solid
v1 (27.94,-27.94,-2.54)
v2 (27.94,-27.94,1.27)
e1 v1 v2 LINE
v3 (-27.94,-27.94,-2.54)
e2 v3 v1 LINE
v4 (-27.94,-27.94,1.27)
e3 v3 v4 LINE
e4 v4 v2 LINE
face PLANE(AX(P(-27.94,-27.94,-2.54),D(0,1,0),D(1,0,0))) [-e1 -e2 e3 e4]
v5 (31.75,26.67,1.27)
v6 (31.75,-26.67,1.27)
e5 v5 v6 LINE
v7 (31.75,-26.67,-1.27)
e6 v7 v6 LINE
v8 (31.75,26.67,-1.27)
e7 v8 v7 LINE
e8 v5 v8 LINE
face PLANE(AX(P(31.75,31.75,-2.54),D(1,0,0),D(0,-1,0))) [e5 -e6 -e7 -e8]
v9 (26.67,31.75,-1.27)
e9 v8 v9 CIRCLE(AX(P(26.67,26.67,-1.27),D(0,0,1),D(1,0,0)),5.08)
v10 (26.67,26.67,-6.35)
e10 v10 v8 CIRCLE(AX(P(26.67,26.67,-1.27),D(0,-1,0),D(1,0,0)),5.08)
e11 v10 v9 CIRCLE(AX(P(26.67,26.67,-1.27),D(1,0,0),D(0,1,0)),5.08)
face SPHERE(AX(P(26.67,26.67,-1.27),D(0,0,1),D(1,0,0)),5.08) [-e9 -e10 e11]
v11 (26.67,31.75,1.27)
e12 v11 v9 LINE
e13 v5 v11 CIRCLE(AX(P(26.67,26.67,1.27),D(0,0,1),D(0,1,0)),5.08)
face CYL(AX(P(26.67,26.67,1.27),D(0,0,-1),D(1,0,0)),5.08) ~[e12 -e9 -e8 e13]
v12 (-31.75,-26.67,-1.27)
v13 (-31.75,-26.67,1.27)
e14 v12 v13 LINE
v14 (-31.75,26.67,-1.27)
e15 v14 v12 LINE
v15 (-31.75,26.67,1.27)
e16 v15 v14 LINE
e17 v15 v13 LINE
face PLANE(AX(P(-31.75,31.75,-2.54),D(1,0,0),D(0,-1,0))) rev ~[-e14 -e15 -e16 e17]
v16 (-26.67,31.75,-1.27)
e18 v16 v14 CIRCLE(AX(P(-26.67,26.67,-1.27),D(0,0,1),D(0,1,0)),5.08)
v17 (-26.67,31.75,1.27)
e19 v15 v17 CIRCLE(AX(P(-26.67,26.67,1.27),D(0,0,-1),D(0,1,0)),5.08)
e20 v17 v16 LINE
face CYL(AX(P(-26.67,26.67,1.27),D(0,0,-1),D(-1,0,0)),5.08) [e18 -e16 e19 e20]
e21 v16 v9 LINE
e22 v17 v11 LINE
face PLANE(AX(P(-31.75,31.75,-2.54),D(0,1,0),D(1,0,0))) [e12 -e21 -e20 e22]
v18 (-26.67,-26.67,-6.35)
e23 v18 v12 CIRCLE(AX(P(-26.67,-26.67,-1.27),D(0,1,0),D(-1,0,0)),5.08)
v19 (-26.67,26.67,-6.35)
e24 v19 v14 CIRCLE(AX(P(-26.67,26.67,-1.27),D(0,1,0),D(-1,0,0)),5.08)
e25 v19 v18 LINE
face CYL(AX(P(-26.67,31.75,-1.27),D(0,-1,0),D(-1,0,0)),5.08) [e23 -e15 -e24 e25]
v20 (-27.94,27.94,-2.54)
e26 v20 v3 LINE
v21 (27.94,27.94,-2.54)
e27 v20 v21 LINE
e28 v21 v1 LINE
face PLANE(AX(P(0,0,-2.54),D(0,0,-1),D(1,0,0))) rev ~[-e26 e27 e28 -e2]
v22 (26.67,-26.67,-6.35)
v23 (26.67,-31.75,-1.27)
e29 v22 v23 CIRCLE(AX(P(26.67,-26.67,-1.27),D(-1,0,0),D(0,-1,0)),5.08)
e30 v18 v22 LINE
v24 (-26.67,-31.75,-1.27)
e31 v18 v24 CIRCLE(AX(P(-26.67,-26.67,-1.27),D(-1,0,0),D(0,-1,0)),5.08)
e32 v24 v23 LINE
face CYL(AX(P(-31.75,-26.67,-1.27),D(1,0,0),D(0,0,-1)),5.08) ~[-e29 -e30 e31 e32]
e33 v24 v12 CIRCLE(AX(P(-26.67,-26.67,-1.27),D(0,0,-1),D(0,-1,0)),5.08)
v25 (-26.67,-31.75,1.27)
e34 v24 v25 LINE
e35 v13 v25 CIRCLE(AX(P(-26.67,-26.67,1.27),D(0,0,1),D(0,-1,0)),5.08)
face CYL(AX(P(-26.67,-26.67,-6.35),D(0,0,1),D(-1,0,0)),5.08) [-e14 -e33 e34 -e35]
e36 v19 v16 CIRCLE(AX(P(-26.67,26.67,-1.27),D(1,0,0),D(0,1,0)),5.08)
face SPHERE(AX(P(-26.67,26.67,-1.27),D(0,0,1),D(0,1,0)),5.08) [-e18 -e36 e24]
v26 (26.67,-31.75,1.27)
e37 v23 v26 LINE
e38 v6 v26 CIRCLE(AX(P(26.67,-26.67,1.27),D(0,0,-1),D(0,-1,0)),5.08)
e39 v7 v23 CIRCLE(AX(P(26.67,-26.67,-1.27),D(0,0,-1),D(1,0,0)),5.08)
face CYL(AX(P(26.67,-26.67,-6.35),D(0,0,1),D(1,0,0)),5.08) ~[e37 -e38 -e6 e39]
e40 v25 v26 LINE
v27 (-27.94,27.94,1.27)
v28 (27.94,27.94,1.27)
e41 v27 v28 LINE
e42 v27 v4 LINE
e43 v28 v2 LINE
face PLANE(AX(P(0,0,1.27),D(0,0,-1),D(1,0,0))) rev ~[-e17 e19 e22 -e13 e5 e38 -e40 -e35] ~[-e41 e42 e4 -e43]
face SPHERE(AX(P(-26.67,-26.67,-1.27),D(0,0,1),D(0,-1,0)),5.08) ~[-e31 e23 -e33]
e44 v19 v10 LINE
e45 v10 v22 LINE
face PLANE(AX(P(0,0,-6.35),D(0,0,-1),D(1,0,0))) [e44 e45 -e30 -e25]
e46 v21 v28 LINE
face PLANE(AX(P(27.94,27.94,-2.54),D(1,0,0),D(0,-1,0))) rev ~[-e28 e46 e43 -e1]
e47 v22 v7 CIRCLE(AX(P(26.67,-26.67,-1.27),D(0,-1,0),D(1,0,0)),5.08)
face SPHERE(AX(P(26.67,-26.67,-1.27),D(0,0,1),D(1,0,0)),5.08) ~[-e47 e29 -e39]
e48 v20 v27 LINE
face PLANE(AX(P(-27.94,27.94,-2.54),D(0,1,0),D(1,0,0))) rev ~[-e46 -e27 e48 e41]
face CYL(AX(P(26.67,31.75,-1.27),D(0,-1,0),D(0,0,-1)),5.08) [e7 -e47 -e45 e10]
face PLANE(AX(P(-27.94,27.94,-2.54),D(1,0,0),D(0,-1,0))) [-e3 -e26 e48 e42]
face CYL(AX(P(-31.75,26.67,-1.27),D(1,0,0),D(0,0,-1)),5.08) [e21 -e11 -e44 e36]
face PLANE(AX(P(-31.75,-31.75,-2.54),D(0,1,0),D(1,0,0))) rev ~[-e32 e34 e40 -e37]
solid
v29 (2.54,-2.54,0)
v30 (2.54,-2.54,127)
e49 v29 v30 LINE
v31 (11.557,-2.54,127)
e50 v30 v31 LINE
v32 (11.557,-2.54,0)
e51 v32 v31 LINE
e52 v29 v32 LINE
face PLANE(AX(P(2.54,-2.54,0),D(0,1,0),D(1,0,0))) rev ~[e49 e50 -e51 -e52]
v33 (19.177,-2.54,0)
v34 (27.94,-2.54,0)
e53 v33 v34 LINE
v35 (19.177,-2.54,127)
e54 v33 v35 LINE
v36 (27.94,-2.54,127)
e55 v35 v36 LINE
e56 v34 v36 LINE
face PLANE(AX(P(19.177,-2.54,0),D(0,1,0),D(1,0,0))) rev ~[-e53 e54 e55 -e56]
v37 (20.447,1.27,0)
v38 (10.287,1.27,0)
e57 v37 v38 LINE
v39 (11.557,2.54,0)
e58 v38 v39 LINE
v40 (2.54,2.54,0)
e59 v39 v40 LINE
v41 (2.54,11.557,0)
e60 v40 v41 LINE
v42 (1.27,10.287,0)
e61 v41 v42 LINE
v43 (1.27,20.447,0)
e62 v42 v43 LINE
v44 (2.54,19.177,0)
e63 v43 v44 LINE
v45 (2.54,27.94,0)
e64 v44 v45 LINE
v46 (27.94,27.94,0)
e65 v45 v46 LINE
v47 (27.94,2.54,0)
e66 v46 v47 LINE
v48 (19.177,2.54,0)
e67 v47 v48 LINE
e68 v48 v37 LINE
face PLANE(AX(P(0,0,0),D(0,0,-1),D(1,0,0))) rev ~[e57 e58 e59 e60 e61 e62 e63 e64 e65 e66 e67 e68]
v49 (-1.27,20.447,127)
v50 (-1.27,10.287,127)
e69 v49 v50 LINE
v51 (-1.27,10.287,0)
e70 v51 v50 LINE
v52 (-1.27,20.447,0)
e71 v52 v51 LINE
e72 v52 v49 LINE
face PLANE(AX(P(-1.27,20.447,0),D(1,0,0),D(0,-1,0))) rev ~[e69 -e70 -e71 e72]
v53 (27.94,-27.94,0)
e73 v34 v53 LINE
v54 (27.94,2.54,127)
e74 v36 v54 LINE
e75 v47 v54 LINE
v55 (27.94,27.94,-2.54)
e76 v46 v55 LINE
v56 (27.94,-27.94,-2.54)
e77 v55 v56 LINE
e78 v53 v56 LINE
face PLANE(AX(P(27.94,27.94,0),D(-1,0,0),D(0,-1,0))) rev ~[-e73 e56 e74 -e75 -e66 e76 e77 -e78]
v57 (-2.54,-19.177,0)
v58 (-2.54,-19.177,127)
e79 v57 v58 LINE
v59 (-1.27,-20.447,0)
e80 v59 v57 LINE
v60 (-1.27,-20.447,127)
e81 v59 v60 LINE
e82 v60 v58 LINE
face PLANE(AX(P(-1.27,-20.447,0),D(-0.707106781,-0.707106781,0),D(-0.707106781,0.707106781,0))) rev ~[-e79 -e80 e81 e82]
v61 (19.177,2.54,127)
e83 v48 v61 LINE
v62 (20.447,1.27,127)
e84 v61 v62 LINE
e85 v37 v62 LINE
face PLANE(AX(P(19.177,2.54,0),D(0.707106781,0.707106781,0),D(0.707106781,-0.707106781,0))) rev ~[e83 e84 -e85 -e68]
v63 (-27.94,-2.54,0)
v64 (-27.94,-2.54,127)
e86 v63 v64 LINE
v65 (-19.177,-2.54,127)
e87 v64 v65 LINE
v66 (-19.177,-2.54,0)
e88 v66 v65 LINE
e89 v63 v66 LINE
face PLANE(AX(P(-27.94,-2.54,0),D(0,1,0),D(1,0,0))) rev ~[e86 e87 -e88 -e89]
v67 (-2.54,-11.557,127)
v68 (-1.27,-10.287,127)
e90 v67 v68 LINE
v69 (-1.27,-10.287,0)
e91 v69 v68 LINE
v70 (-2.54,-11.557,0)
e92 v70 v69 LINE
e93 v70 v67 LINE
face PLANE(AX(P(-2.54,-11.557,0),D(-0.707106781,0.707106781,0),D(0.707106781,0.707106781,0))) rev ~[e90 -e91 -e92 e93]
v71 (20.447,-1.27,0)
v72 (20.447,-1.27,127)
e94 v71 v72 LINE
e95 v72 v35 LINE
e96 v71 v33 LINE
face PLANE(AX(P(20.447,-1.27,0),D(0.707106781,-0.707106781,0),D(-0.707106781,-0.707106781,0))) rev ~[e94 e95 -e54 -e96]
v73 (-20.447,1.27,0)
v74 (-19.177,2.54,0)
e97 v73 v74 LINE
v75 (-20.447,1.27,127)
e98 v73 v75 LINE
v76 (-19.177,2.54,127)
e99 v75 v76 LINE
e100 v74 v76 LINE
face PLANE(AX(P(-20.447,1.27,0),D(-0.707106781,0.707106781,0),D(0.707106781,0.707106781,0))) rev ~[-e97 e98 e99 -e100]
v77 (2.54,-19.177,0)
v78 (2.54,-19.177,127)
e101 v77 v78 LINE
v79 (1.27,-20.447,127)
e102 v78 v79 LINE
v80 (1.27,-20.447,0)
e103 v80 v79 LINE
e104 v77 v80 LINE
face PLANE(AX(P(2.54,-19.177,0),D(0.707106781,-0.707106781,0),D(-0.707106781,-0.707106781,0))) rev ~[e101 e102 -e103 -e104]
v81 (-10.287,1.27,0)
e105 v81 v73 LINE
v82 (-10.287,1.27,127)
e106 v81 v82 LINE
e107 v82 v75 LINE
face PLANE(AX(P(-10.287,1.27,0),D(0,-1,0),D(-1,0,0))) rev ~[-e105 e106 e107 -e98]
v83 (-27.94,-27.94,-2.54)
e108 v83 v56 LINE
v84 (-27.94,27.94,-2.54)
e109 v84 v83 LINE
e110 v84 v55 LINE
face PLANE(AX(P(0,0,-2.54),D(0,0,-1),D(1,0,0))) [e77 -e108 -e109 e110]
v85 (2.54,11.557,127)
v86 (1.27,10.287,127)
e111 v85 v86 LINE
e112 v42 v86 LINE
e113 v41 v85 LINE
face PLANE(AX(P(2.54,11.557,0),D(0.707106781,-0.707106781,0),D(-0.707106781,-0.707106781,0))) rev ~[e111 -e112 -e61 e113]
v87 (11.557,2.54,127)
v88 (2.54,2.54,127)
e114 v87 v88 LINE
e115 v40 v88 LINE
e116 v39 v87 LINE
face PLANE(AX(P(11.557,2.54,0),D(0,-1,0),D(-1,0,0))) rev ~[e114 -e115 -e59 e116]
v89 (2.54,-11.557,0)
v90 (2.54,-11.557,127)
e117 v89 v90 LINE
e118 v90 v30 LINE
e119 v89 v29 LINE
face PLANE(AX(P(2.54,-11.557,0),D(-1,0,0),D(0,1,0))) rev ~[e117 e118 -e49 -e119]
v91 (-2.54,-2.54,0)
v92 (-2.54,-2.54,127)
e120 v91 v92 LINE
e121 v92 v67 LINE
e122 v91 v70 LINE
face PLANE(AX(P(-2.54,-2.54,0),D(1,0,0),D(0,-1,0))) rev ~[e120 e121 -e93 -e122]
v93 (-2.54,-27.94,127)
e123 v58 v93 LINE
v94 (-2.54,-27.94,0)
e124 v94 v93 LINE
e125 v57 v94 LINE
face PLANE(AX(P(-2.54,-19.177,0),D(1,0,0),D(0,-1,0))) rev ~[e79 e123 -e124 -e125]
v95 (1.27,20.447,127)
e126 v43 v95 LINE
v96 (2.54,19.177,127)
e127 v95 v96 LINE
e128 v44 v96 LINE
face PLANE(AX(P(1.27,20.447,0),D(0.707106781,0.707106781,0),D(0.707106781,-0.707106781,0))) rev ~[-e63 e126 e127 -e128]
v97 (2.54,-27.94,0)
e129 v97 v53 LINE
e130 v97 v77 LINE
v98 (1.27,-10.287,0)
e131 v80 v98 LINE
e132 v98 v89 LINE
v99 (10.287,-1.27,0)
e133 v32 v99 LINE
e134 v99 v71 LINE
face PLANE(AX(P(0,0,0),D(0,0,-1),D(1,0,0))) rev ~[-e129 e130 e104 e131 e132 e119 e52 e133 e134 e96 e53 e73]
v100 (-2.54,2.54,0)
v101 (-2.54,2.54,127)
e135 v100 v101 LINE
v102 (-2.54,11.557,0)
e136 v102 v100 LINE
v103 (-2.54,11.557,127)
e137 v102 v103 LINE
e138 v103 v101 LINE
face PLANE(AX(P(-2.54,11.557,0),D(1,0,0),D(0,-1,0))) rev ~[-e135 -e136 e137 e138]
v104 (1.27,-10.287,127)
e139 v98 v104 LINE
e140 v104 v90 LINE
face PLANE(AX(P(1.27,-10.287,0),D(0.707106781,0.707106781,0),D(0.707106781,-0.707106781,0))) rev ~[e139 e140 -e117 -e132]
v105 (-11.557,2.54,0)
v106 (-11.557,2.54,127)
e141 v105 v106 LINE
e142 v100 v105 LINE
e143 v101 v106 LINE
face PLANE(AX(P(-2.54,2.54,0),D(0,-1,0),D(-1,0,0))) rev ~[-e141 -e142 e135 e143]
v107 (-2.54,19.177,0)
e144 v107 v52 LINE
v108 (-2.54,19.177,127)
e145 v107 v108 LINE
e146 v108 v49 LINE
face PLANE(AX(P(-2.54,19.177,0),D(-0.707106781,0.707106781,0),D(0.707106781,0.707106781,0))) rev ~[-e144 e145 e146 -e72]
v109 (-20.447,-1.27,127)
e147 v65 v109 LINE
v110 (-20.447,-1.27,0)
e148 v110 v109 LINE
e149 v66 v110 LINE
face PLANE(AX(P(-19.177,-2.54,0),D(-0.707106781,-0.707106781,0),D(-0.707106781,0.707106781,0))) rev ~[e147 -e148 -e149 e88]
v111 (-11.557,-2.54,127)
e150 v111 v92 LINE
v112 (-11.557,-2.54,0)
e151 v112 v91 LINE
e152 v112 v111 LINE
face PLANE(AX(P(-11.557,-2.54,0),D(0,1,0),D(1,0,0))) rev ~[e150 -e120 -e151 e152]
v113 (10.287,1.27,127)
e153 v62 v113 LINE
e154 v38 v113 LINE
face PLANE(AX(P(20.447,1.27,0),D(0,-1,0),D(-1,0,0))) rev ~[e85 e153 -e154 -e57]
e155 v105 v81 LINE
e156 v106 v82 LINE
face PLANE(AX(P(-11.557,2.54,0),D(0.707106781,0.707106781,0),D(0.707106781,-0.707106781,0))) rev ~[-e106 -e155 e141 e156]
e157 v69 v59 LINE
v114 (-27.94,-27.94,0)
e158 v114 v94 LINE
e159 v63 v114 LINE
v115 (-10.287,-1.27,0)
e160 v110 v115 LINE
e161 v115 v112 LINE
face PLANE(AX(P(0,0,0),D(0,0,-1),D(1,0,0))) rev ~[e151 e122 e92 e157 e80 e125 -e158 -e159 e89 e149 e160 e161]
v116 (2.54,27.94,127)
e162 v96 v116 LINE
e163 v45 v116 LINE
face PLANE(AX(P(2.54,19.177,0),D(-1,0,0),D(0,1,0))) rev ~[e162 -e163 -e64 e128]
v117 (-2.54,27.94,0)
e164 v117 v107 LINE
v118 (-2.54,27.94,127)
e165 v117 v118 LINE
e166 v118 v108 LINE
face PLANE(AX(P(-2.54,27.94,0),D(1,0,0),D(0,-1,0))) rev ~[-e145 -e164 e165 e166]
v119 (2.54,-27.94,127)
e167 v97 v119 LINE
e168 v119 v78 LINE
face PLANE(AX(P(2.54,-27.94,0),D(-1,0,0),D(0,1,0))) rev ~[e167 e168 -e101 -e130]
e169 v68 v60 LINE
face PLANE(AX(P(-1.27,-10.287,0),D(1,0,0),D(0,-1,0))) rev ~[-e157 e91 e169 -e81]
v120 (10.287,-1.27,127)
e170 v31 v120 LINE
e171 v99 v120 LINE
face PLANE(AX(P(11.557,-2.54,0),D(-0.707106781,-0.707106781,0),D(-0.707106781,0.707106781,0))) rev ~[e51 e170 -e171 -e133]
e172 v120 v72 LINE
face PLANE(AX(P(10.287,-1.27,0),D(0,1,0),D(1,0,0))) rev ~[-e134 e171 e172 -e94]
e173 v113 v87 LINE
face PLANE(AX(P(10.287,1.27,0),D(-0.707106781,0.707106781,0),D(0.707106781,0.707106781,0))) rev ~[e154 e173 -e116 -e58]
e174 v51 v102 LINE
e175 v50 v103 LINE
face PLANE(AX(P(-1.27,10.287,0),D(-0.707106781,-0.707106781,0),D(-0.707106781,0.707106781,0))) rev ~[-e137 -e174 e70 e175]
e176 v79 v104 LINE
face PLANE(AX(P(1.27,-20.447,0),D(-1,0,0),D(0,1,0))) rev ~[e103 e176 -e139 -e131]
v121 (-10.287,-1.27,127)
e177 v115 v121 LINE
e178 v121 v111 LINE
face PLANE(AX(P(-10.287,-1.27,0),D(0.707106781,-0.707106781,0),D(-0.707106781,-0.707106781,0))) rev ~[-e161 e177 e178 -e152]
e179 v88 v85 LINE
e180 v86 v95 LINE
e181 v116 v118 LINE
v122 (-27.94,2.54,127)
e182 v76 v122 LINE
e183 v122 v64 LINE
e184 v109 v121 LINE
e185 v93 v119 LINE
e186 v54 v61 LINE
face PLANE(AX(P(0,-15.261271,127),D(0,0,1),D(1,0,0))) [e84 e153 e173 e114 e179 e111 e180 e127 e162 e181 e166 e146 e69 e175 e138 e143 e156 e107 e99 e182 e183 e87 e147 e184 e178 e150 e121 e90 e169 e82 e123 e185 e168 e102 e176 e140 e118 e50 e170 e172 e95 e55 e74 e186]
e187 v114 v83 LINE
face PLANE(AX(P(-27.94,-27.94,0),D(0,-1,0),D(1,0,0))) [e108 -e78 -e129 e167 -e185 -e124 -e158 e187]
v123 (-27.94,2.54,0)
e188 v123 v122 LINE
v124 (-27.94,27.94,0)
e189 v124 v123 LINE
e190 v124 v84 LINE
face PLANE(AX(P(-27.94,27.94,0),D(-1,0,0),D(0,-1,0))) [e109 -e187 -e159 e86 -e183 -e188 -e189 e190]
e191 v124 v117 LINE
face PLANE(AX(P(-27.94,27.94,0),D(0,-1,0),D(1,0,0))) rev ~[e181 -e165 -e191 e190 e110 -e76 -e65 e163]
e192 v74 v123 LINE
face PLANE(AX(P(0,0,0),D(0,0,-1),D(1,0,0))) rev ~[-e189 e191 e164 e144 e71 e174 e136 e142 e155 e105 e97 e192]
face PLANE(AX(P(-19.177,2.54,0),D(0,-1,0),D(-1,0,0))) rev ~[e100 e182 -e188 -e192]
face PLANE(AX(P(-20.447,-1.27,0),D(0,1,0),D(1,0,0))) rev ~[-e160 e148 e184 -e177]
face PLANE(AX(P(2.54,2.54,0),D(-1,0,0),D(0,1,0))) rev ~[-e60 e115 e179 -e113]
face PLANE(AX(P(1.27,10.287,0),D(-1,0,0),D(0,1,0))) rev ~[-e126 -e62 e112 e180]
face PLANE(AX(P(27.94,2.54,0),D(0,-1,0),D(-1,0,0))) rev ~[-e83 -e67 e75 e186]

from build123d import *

# Parameters (mm, degrees)
F0_W     = 5.08
F0_H     = 5.08
F1_DEPTH = 127
F2_W     = 55.88
F2_H     = 55.88
F3_DEPTH = 2.54
F4_W     = 63.5
F4_H     = 63.5
F4_W_2   = 55.88
F4_H_2   = 55.88
F5_DEPTH = 3.81
F6_DEPTH = 3.81
F7_R     = 5.08


with BuildPart() as f1:
    # F0 (on Top) → F1 (new body)
    with BuildSketch(Plane.XY):
        Polygon((2.54, -2.54), (-2.54, -2.54), (-2.54, -11.557), (-1.27, -10.287), (-1.27, -15.367), (-1.27, -20.447), (-2.54, -19.177), (-2.54, -27.94), (2.54, -27.94), (2.54, -19.177), (1.27, -20.447), (1.27, -15.367), (1.27, -10.287), (2.54, -11.557), align=None)
        Rectangle(F0_W, F0_H)
        Polygon((-2.54, -2.54), (-2.54, 2.54), (-11.557, 2.54), (-10.287, 1.27), (-15.367, 1.27), (-20.447, 1.27), (-19.177, 2.54), (-27.94, 2.54), (-27.94, -2.54), (-19.177, -2.54), (-20.447, -1.27), (-15.367, -1.27), (-10.287, -1.27), (-11.557, -2.54), align=None)
        Polygon((2.54, 27.94), (-2.54, 27.94), (-2.54, 19.177), (-1.27, 20.447), (-1.27, 15.367), (-1.27, 10.287), (-2.54, 11.557), (-2.54, 2.54), (2.54, 2.54), (2.54, 11.557), (1.27, 10.287), (1.27, 15.367), (1.27, 20.447), (2.54, 19.177), align=None)
        Polygon((11.557, 2.54), (2.54, 2.54), (2.54, -2.54), (11.557, -2.54), (10.287, -1.27), (15.367, -1.27), (20.447, -1.27), (19.177, -2.54), (27.94, -2.54), (27.94, 2.54), (19.177, 2.54), (20.447, 1.27), (15.367, 1.27), (10.287, 1.27), align=None)
    extrude(amount=F1_DEPTH)

    # F2 (on face) → F3 (join)
    with BuildSketch(Plane(origin=(0, 0, 0), x_dir=(1, 0, 0), z_dir=(0, 0, -1))):
        Rectangle(F2_W, F2_H)
    extrude(amount=F3_DEPTH)


with BuildPart() as f5:
    # F4 (on face) → F5 (new body)
    with BuildSketch(Plane(origin=(0, 0, -2.54), x_dir=(1, 0, 0), z_dir=(0, 0, -1))):
        Rectangle(F4_W, F4_H)
        Rectangle(F4_W_2, F4_H_2, mode=Mode.SUBTRACT)
        Rectangle(F4_W_2, F4_H_2)
    extrude(amount=F5_DEPTH)

    # F4 (on face) → F6 (join)
    with BuildSketch(Plane(origin=(0, 0, -2.54), x_dir=(1, 0, 0), z_dir=(0, 0, -1))):
        Rectangle(F4_W, F4_H)
        Rectangle(F4_W_2, F4_H_2, mode=Mode.SUBTRACT)
    extrude(amount=-F6_DEPTH)

    # F7
    f7_edges = [f5.edges().sort_by_distance(p)[0] for p in [
        (-31.75, -31.75, -2.54),
        (31.75, -31.75, -2.54),
        (31.75, 31.75, -2.54),
        (31.75, 0, -6.35),
        (0, -31.75, -6.35),
        (-31.75, 31.75, -2.54),
        (0, 31.75, -6.35),
        (-31.75, 0, -6.35),
    ]]
    fillet(f7_edges, radius=F7_R)


solid = Compound([f1.part, f5.part])
